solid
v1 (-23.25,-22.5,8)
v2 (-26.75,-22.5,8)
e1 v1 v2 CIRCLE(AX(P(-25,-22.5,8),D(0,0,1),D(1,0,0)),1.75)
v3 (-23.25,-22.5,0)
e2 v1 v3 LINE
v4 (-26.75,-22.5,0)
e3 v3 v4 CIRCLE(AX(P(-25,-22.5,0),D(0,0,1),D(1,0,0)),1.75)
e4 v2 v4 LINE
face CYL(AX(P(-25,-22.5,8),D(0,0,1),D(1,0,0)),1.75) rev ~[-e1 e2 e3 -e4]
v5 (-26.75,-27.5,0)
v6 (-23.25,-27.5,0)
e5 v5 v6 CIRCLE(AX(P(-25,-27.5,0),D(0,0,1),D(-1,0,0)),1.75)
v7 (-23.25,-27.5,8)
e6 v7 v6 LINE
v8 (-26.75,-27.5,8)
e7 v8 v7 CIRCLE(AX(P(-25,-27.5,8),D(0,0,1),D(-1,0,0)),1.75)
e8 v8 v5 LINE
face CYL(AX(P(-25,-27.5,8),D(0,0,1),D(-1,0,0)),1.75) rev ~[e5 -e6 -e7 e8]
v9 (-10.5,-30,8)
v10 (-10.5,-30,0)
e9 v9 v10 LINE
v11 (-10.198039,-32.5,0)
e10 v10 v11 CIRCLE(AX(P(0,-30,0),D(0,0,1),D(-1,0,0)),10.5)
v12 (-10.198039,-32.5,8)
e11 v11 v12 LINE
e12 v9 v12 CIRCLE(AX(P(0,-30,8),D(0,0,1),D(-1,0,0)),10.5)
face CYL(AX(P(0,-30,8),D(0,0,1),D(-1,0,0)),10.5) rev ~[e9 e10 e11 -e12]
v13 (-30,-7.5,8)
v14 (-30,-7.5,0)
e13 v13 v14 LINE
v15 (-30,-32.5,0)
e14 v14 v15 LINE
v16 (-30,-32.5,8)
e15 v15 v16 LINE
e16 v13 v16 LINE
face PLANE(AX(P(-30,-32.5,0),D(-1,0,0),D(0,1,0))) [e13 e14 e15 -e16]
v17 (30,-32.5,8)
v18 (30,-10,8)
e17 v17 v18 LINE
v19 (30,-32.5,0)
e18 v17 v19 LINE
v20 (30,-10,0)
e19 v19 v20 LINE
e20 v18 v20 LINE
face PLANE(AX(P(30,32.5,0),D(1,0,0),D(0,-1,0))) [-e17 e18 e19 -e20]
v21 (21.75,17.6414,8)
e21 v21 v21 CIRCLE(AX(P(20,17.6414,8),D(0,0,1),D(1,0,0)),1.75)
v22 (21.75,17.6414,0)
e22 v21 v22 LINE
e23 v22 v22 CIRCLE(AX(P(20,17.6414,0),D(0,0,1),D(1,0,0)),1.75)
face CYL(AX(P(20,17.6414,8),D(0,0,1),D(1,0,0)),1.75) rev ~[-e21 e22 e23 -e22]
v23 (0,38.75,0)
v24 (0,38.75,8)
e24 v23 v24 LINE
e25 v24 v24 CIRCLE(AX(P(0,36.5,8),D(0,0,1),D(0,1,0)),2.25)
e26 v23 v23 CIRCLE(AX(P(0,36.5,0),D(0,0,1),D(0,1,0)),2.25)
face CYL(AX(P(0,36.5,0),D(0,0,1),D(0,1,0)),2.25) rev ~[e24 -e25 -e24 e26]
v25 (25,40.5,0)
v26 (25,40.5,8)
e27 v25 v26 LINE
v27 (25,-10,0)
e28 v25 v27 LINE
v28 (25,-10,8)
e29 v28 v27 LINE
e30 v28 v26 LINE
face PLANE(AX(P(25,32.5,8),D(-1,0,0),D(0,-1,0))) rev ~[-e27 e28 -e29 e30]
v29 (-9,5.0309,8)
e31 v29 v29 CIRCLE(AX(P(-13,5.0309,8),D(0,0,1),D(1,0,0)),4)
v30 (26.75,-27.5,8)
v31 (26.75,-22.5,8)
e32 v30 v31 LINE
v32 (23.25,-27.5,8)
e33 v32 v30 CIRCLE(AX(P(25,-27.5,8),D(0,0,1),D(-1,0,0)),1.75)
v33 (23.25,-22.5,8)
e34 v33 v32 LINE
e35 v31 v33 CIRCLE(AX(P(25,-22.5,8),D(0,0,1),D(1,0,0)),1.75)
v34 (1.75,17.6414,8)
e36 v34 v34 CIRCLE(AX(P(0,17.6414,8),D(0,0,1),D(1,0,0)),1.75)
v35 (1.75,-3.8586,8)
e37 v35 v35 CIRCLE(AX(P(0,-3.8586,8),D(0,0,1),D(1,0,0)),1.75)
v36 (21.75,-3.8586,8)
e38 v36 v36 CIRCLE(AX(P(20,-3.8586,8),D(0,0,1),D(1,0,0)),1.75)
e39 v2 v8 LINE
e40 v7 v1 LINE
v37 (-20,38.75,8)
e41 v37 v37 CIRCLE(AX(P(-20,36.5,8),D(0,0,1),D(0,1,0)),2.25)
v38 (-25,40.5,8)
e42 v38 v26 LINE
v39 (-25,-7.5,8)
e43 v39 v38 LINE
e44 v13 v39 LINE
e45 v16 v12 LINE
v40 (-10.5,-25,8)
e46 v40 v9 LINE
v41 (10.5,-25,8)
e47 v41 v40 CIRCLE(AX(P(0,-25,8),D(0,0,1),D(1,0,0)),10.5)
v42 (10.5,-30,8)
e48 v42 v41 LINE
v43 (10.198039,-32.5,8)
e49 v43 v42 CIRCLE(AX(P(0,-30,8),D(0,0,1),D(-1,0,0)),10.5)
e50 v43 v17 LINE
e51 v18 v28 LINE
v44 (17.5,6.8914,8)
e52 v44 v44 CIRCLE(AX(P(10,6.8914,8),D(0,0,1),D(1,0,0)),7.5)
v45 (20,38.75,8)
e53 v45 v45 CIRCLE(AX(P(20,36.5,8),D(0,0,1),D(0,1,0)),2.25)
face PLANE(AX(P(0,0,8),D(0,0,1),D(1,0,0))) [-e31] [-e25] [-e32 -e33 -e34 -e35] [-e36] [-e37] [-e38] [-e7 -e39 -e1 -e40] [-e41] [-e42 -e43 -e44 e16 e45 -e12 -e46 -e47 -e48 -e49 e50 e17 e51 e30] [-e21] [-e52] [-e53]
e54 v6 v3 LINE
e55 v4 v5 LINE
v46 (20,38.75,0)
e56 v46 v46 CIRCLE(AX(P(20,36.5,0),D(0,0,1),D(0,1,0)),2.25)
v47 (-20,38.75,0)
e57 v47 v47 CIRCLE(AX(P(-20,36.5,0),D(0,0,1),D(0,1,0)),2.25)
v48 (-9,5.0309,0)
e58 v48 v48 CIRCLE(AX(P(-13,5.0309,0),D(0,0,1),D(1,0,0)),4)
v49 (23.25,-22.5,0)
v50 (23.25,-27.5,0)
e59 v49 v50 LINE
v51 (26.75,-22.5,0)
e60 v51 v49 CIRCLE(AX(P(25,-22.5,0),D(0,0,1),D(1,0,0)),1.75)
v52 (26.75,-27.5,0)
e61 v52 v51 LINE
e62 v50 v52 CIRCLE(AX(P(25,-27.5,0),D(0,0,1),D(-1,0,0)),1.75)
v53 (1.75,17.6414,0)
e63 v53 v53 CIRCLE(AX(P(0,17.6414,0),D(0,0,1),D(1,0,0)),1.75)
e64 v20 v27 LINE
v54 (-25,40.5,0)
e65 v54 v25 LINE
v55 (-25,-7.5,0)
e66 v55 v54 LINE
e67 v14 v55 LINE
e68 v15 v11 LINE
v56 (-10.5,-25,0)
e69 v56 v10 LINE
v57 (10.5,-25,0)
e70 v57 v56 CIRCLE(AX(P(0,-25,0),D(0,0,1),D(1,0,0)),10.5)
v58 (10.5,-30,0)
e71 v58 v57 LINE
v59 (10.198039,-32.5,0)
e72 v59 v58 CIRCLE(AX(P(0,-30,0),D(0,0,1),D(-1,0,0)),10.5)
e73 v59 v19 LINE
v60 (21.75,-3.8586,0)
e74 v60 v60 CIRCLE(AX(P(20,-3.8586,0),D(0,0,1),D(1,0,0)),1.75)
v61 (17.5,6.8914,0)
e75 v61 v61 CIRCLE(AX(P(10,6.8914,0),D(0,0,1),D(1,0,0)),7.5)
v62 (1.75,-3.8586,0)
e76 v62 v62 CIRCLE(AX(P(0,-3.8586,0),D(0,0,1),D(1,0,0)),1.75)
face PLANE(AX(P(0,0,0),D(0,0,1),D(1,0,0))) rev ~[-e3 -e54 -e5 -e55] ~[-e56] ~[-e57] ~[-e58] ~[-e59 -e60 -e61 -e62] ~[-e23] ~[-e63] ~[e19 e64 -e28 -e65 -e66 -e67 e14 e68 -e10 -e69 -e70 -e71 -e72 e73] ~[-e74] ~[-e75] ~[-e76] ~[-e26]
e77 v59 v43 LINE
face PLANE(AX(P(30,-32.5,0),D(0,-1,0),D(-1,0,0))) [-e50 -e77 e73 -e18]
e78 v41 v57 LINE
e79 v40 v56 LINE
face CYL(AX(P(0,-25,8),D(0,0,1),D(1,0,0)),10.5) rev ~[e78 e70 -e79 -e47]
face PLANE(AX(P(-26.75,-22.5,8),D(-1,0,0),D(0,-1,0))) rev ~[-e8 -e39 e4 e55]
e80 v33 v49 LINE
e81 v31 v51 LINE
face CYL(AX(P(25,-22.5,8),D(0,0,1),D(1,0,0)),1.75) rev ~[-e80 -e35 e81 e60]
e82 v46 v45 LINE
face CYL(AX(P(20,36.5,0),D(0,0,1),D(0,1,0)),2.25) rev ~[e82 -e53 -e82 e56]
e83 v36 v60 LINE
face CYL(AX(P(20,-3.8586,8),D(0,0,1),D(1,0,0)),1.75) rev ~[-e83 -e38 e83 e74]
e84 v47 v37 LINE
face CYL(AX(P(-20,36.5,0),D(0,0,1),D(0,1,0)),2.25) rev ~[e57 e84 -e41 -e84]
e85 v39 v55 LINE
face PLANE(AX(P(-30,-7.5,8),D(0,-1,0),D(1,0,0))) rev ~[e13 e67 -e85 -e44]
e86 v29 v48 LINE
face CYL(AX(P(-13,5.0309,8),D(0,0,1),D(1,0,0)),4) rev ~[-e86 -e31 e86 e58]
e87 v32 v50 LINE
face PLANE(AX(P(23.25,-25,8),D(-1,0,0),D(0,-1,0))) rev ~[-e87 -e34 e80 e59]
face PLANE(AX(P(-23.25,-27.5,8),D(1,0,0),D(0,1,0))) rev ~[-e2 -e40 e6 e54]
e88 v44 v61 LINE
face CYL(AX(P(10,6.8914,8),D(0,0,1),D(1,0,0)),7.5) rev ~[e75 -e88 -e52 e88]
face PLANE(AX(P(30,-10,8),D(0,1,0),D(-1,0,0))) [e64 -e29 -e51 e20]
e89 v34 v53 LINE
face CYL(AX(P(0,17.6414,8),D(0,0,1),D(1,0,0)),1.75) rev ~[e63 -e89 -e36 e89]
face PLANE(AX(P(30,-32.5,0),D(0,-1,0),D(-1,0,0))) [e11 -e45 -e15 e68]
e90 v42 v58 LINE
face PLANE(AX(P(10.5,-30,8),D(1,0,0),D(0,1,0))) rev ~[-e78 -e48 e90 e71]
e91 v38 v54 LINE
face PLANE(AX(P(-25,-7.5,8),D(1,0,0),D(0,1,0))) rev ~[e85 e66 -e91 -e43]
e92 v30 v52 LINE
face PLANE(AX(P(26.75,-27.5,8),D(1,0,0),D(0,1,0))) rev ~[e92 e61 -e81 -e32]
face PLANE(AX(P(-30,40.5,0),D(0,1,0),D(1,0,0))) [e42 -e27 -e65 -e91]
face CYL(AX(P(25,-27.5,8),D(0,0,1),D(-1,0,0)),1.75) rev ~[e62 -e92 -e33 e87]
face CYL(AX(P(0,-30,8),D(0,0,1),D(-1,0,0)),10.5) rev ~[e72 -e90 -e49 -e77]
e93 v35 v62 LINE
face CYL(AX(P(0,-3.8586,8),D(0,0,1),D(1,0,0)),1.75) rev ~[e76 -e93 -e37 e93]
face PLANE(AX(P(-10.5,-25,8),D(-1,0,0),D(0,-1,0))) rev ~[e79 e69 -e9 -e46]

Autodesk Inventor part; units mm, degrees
ref_plane "YZ Plane" through (0, 0, 0) normal (1, 0, 0) x (0, 1, 0)
ref_plane "XZ Plane" through (0, 0, 0) normal (0, 1, 0) x (-1, 0, 0)
ref_plane "XY Plane" through (0, 0, 0) normal (0, 0, 1) x (1, 0, 0)
sketch "Sketch1" plane through (0, 0, 0) normal (0, 0, 1) x (1, 0, 0)
  line L0 (-30, 32.5) -> (30, 32.5)
  line L1 (30, 32.5) -> (30, -32.5)
  line L2 (30, -32.5) -> (-30, -32.5)
  line L3 (-30, -32.5) -> (-30, 32.5)
  point P0 (0, 0)
  point P1 (0, 32.5)
  point P2 (-30, 0)
  dimension "d0" = 60
  dimension "d1" = 65
extrude "Extrusion1" add sketch "Sketch1" along normal blind 8
sketch "Sketch4" plane through (0, 0, 8) normal (0, 0, 1) x (1, 0, 0)
  circle A0 centre (-25, -15) radius 1.75
  circle A1 centre (25, -15) radius 1.75
  circle A2 centre (25, -25) radius 1.75
  arc A3 (-10.5, -30) -> (10.5, -30) centre (0, -30) ccw
  line L0 (10.5, -30) -> (10.5, -25)
  arc A4 (10.5, -25) -> (-10.5, -25) centre (0, -25) ccw
  line L1 (-10.5, -25) -> (-10.5, -30)
  line L2 (30, -10) -> (30, -50)
  line L3 (30, -50) -> (-30, -50)
  line L4 (-30, -50) -> (-30, -10)
  line L5 (-30, -10) -> (30, -10)
  line L6 (25, -27.5) -> (25, -22.5) construction
  line L7 (26.75, -27.5) -> (26.75, -22.5)
  line L8 (23.25, -22.5) -> (23.25, -27.5)
  arc A5 (23.25, -27.5) -> (26.75, -27.5) centre (25, -27.5) ccw
  arc A6 (26.75, -22.5) -> (23.25, -22.5) centre (25, -22.5) ccw
  line L9 (-25, -27.5) -> (-25, -22.5) construction
  line L10 (-23.25, -27.5) -> (-23.25, -22.5)
  line L11 (-26.75, -22.5) -> (-26.75, -27.5)
  arc A7 (-26.75, -27.5) -> (-23.25, -27.5) centre (-25, -27.5) ccw
  arc A8 (-23.25, -22.5) -> (-26.75, -22.5) centre (-25, -22.5) ccw
  line L12 (-30, -32.5) -> (30, -32.5) projected
  point P0 (0, 0)
  point P1 (-25, -25)
  point P2 (26.75, -25)
  point P3 (23.25, -25)
  dimension "d22" = 5
  dimension "d23" = 3.5
  dimension "d24" = 5
  dimension "d25" = 10.5
  dimension "d26" = 7.5
  dimension "d27" = 30
extrude "Extrusion4" cut sketch "Sketch4" against normal blind 10 contours A2 | L7 A5 L8 A2 | A2 L8 A6 L7 | L1 A4 L0 A3 L12 | L12 A3 | A7 L11 A8 L10
sketch "Sketch5" plane through (0, 0, 8) normal (0, 0, 1) x (1, 0, 0)
  circle A0 centre (10, 6.8914) radius 7.5
  line L0 (30, 32.5) -> (-30, 32.5) projected
  line L1 (30, -32.5) -> (30, 32.5) projected
  point P0 (0, 0)
  dimension "d13" = 15
  dimension "d28" = 25.6086
  dimension "d29" = 20
extrude "Extrusion5" cut sketch "Sketch5" against normal through all
sketch "Sketch6" plane through (0, 0, 8) normal (0, 0, 1) x (1, 0, 0)
  circle A0 centre (20, 17.6414) radius 1.75
  circle A1 centre (0, 17.6414) radius 1.75
  circle A2 centre (0, -3.8586) radius 1.75
  circle A3 centre (20, -3.8586) radius 1.75
  line L0 (0, 17.6414) -> (20, 17.6414) construction
  line L1 (20, 17.6414) -> (20, -3.8586) construction
  line L2 (20, -3.8586) -> (0, -3.8586) construction
  line L3 (0, -3.8586) -> (0, 17.6414) construction
  line L4 (30, -32.5) -> (30, 32.5) construction
  line L5 (30, 32.5) -> (-30, 32.5) construction
  circle A4 centre (10, 6.8914) radius 7.5 projected
  point P0 (0, 0)
  point P1 (10, -3.8586)
  point P2 (20, 6.8914)
  dimension "d31" = 21.5
  dimension "d33" = 3.5
  dimension "d42" = 20
extrude "Extrusion6" cut sketch "Sketch6" against normal through all contours A0 | A1 | A2 | A3
sketch "Sketch7" plane through (0, 0, 8) normal (0, 0, 1) x (1, 0, 0)
  line L0 (-30, 32.5) -> (-30, -32.5) projected
  line L1 (-30, -7.5) -> (-25, -7.5)
  line L2 (-25, -7.5) -> (-25, 32.5)
  line L3 (-25, 32.5) -> (-30, 32.5)
  line L4 (-30, 32.5) -> (-30, -7.5)
  line L5 (30, 32.5) -> (-30, 32.5) projected
  line L6 (30, -10) -> (-30, -10) projected
  line L7 (25, -10) -> (30, -10)
  line L8 (30, -10) -> (30, 32.5)
  line L9 (30, 32.5) -> (25, 32.5)
  line L10 (25, 32.5) -> (25, -10)
  line L11 (30, -32.5) -> (30, 32.5) projected
  point P0 (0, 0)
  point P1 (25, -10)
  dimension "d18" = 5
  dimension "d19" = 5
  dimension "d43" = 40
extrude "Extrusion7" cut sketch "Sketch7" against normal through all contours L3 L2 L1 L0 | L5 L8 L6 L10
sketch "Sketch8" plane through (0, 0, 8) normal (0, 0, 1) x (1, 0, 0)
  circle A0 centre (-13, 5.0309) radius 4
  line L0 (-30, -7.5) -> (-30, -32.5) projected
  line L1 (25, 32.5) -> (-25, 32.5) projected
  point P0 (0, 0)
  dimension "d35" = 8
  dimension "d36" = 17
  dimension "d37" = 27.4691
extrude "Extrusion8" cut sketch "Sketch8" against normal blind 10
move faces "Move1" translate (0, 8, 0) faces at (8.3333, 32.5, 2.6667)
sketch "Sketch9" plane through (0, 0, 0) normal (0, 0, -1) x (-1, 0, 0)
  line L0 (-25, 40.5) -> (25, 40.5) projected
  point P0 (0, 0)
  point P1 (0, 36.5)
  point P2 (-20, 36.5)
  point P3 (20, 36.5)
  dimension "d47" = 20
  dimension "d48" = 20
  dimension "d49" = 4
hole "Hole1" at (0, 36.5, 0) at (20, 36.5, 0) at (-20, 36.5, 0) direction (0, 0, 1) diameter 4.5 end through all
equation "\"d19\" = d18"
equation "\"d48\" = d47"
properties part number "0005-10-005"
